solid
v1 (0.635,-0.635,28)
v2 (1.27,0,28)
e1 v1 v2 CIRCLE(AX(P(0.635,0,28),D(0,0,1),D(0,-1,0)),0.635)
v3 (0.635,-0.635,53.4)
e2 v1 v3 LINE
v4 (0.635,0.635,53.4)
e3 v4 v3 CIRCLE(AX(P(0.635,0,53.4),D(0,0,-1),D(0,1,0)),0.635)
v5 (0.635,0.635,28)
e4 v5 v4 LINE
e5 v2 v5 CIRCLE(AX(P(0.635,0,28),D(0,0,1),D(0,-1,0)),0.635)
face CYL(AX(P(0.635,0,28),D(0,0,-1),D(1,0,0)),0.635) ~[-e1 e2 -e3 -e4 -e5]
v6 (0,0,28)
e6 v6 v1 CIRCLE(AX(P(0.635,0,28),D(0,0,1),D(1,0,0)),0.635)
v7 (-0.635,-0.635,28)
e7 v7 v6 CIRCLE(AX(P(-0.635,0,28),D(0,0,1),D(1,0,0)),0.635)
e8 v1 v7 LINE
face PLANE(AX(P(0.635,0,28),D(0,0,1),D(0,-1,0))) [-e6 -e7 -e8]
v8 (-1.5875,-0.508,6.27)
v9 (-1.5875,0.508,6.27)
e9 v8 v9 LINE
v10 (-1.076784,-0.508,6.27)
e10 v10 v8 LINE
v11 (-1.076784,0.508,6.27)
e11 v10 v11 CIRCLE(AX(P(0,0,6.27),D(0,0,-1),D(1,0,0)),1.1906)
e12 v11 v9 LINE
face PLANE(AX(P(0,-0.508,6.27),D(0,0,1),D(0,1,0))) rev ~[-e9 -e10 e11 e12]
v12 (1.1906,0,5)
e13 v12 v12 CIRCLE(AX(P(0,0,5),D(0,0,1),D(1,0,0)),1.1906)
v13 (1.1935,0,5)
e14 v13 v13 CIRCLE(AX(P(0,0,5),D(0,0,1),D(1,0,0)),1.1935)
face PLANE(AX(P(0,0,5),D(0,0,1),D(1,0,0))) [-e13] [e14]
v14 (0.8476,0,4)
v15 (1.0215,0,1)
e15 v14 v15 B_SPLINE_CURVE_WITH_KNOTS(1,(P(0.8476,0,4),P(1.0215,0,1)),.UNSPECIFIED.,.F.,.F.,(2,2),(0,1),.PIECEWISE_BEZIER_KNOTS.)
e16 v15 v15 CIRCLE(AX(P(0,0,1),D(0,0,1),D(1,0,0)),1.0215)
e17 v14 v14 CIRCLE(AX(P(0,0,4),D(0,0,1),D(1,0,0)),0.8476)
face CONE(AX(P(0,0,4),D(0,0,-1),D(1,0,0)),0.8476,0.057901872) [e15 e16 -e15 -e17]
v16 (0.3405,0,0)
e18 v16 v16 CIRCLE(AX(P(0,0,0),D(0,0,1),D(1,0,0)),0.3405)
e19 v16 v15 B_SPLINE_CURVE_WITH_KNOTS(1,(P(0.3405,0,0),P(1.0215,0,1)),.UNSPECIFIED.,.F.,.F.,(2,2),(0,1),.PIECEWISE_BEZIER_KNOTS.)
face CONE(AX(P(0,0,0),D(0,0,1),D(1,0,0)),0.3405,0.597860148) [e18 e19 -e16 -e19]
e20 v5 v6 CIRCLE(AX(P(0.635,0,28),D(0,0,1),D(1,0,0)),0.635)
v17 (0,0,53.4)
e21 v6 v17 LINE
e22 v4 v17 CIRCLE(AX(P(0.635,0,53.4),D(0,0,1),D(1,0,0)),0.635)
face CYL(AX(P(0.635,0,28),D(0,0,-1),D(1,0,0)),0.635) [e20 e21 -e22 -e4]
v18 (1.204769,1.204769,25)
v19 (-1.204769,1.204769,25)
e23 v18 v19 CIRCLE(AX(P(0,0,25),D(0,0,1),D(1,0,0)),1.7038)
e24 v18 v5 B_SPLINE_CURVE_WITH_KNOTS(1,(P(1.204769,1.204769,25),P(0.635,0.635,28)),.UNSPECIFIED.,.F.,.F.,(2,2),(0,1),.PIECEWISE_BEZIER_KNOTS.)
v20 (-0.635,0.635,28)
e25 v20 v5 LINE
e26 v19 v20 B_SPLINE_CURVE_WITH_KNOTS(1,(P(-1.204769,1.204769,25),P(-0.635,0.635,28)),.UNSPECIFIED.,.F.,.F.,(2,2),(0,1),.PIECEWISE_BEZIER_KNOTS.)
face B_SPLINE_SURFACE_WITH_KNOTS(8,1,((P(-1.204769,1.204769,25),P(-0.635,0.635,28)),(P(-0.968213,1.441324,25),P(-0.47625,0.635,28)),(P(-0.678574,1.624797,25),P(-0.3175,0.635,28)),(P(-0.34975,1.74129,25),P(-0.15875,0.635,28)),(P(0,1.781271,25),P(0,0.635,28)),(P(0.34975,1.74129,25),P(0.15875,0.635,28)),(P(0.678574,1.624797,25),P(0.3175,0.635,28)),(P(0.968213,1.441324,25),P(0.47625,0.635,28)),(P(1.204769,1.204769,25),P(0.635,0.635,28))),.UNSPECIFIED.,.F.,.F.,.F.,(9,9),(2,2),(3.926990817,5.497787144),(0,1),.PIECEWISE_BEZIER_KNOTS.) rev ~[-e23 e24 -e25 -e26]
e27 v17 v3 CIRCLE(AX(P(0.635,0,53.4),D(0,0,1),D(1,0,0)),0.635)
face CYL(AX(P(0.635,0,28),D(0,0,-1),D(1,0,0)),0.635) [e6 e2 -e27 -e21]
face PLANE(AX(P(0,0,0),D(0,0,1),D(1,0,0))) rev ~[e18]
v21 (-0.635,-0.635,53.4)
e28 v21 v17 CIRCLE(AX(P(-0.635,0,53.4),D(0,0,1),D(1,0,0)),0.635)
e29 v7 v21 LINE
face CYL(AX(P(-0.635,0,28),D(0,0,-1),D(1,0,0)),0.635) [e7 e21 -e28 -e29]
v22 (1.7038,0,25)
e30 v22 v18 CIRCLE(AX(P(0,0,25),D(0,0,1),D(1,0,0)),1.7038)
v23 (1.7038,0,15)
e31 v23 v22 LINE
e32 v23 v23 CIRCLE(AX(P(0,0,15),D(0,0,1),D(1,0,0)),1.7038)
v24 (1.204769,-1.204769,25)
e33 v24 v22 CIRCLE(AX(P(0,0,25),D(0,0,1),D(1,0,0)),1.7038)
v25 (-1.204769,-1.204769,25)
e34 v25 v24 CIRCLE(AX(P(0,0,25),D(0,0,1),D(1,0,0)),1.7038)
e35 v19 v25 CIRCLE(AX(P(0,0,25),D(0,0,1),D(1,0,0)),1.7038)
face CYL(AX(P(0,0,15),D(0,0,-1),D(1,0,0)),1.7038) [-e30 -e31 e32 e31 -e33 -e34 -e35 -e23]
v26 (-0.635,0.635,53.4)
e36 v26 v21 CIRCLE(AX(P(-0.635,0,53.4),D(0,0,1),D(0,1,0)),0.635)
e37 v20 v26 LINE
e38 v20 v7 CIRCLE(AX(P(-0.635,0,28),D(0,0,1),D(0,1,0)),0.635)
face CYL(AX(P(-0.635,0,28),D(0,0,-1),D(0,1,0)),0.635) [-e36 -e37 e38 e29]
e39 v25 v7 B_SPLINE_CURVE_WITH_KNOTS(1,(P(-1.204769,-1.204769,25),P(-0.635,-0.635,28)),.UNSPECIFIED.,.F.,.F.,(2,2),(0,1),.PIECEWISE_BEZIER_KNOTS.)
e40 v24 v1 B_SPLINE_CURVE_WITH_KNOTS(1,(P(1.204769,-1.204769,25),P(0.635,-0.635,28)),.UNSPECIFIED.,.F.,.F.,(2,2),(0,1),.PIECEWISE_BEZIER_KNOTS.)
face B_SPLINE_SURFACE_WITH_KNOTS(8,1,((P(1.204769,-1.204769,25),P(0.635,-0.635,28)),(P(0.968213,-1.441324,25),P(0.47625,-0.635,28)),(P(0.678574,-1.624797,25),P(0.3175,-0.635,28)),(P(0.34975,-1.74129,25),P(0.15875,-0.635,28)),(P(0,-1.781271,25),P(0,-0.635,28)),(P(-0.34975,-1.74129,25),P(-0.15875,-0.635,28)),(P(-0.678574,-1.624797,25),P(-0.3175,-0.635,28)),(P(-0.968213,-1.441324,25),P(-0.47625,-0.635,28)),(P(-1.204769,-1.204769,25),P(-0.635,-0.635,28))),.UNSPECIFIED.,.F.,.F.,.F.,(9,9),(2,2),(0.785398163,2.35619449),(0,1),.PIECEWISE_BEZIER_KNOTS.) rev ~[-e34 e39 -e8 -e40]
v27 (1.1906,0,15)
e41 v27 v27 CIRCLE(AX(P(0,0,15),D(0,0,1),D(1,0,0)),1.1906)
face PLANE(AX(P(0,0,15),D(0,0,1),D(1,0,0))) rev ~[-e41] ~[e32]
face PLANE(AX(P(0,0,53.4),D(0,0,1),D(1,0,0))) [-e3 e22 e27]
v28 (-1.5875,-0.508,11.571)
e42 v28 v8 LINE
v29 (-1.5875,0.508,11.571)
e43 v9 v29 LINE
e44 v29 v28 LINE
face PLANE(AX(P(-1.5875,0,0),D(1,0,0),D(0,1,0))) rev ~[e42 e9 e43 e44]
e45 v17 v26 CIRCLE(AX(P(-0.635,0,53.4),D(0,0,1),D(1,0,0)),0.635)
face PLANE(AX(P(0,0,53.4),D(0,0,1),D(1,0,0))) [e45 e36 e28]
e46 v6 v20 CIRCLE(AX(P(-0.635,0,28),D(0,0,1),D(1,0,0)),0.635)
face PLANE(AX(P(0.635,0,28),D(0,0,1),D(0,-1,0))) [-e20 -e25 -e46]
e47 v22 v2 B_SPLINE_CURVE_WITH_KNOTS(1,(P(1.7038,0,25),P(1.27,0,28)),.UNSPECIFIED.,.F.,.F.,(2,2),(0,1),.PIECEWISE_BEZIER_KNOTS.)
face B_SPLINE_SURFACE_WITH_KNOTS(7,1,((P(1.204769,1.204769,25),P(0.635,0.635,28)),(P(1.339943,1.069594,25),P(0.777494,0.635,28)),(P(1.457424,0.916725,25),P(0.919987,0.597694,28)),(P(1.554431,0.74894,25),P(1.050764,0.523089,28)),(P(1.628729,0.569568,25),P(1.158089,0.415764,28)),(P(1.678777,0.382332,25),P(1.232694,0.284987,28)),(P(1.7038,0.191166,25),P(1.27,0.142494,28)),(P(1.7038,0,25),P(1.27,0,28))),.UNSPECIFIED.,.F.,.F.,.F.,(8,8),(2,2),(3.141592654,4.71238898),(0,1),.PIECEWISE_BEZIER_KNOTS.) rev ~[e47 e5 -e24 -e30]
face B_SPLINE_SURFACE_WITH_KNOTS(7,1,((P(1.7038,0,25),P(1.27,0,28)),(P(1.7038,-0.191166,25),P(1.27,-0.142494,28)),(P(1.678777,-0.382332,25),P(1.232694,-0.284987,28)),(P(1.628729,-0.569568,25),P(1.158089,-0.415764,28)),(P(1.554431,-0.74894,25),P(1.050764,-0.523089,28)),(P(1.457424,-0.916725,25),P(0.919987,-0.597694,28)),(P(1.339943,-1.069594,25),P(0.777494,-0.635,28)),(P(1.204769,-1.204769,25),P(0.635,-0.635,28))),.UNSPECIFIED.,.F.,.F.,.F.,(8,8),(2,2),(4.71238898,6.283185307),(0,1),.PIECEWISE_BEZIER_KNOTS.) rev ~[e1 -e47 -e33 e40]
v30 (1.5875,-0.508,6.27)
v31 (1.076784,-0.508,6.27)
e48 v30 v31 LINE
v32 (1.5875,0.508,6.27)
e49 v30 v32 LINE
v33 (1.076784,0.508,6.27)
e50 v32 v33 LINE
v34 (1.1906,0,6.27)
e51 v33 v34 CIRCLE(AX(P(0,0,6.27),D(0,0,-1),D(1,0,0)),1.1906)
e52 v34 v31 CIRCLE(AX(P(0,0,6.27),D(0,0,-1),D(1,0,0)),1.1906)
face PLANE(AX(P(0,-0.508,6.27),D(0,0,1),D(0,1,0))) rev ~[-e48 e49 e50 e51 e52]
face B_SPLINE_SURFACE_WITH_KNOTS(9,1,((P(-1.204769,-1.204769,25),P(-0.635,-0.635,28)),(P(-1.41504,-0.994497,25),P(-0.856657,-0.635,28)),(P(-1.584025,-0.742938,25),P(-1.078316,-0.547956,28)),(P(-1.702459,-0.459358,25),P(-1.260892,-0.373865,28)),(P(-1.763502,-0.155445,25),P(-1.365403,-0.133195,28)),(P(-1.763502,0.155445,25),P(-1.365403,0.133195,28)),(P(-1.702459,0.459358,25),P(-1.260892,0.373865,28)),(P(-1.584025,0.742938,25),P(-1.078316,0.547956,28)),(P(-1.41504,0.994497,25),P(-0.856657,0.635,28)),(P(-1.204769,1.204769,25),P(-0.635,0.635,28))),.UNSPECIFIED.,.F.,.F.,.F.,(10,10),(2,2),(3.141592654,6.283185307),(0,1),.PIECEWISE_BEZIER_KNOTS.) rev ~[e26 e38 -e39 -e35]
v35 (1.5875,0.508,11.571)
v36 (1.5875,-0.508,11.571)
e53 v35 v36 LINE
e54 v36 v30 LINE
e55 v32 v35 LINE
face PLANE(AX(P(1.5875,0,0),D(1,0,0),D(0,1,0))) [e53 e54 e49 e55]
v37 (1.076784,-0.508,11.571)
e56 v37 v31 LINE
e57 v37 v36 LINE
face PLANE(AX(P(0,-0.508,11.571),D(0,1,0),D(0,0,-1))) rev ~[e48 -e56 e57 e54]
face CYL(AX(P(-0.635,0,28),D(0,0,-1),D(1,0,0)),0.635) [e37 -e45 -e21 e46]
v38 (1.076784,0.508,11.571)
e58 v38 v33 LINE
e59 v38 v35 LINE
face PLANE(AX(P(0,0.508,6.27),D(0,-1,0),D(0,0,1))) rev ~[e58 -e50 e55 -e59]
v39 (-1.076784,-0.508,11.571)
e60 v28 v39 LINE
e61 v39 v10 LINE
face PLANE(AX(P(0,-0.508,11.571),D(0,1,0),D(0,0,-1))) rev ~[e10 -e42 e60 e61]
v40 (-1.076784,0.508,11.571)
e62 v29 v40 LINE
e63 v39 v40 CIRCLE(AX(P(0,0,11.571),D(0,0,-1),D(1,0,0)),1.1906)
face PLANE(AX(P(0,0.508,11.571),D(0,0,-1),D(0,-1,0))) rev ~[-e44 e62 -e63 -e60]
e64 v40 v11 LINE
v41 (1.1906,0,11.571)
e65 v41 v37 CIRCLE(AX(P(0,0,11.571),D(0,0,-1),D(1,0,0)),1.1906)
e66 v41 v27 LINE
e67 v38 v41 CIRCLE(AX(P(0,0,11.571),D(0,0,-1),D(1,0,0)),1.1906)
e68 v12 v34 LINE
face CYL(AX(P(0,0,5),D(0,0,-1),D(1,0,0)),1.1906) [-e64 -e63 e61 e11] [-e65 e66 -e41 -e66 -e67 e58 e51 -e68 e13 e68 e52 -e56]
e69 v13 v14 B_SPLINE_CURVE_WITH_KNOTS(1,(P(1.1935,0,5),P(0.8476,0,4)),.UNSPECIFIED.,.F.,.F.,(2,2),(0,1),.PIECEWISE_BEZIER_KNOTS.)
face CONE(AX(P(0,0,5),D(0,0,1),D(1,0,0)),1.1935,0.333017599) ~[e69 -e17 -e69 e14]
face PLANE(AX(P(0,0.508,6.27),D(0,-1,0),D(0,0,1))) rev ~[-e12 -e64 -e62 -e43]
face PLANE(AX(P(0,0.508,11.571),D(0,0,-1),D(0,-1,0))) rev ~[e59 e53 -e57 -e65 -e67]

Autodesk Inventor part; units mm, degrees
sketch "Sketch1" plane through (0, 0, 0) normal (0, 0, 1) x (1, 0, 0)
  circle A0 centre (0, 0) radius 0.3405
  dimension "d0" = 0.681
ref_plane "Work Plane1" through (0, 0, 1) normal (0, 0, 1) x (1, 0, 0)
sketch "Sketch2" plane through (0, 0, 1) normal (0, 0, 1) x (1, 0, 0)
  circle A0 centre (0, 0) radius 1.0215
  dimension "d2" = 2.043
ref_plane "Work Plane2" through (0, 0, 4) normal (0, 0, 1) x (1, 0, 0)
sketch "Sketch3" plane through (0, 0, 4) normal (0, 0, 1) x (1, 0, 0)
  circle A0 centre (0, 0) radius 0.8476
  dimension "d4" = 1.6951
ref_plane "Work Plane3" through (0, 0, 5) normal (0, 0, 1) x (1, 0, 0)
sketch "Sketch4" plane through (0, 0, 5) normal (0, 0, 1) x (1, 0, 0)
  circle A0 centre (0, 0) radius 1.1935
  dimension "d6" = 2.387
loft "Loft1" add profiles "Sketch4", "Sketch3"
loft "Loft2" add profiles "Sketch2" section 1 edges at (-0.8476, 0, 4)
loft "Loft3" add profiles "Sketch1" section 2 edges at (-1.0215, 0, 1)
sketch "Sketch5" plane through (0, 0, 5) normal (0, 0, 1) x (1, 0, 0)
  circle A0 centre (0, 0) radius 1.1906
  dimension "d35" = 2.3813
extrude "Extrusion1" add sketch "Sketch5" along normal blind 10
sketch "Sketch6" plane through (0, 0, 15) normal (0, 0, 1) x (1, 0, 0)
  circle A0 centre (0, 0) radius 1.7038
  dimension "d21" = 3.4076
extrude "Extrusion2" add sketch "Sketch6" along normal blind 10
ref_plane "Work Plane4" through (0, 0, 28) normal (0, 0, 1) x (1, 0, 0)
sketch "Sketch7" plane through (0, 0, 28) normal (0, 0, 1) x (1, 0, 0)
  arc A0 (-0.635, 0.635) -> (-0.635, -0.635) centre (-0.635, 0) ccw
  arc A1 (0.635, -0.635) -> (0.635, 0.635) centre (0.635, 0) ccw
  line L0 (-0.635, 0.635) -> (0.635, 0.635)
  line L1 (0.635, -0.635) -> (-0.635, -0.635)
loft "Loft4" add profiles "Sketch7" section 1 edges at (-1.7038, 0, 25)
sketch "Sketch8" plane through (0, 0, 28) normal (0, 0, 1) x (1, 0, 0)
  arc A0 (-0.635, 0.635) -> (-0.635, -0.635) centre (-0.635, 0) ccw projected
  circle A1 centre (-0.635, 0) radius 0.635
  arc A2 (0.635, -0.635) -> (0.635, 0.635) centre (0.635, 0) ccw projected
  circle A3 centre (0.635, 0) radius 0.635
  point P0 (0, 0)
extrude "Extrusion3" add sketch "Sketch8" along normal blind 25.4
ref_plane "Work Plane5" through (0, 0, 0) normal (1, 0, 0) x (0, 1, 0)
sketch "Sketch9" plane through (0, 0, 0) normal (1, 0, 0) x (0, 1, 0)
  line L0 (0.508, 11.571) -> (-0.508, 11.571)
  line L1 (-0.508, 11.571) -> (-0.508, 6.27)
  line L2 (-0.508, 6.27) -> (0.508, 6.27)
  line L3 (0.508, 6.27) -> (0.508, 11.571)
  line L4 (-1.7038, 15) -> (1.7038, 15) projected
  line L5 (-1.1935, 5) -> (1.1935, 5) projected
  point P0 (0, 0)
  dimension "d37" = 0.508
  dimension "d38" = 0.508
  dimension "d39" = 3.429
  dimension "d40" = 1.27
extrude "Extrusion4" add sketch "Sketch9" along normal mid plane 3.175
properties part number "Snap-Twist Idea M"
